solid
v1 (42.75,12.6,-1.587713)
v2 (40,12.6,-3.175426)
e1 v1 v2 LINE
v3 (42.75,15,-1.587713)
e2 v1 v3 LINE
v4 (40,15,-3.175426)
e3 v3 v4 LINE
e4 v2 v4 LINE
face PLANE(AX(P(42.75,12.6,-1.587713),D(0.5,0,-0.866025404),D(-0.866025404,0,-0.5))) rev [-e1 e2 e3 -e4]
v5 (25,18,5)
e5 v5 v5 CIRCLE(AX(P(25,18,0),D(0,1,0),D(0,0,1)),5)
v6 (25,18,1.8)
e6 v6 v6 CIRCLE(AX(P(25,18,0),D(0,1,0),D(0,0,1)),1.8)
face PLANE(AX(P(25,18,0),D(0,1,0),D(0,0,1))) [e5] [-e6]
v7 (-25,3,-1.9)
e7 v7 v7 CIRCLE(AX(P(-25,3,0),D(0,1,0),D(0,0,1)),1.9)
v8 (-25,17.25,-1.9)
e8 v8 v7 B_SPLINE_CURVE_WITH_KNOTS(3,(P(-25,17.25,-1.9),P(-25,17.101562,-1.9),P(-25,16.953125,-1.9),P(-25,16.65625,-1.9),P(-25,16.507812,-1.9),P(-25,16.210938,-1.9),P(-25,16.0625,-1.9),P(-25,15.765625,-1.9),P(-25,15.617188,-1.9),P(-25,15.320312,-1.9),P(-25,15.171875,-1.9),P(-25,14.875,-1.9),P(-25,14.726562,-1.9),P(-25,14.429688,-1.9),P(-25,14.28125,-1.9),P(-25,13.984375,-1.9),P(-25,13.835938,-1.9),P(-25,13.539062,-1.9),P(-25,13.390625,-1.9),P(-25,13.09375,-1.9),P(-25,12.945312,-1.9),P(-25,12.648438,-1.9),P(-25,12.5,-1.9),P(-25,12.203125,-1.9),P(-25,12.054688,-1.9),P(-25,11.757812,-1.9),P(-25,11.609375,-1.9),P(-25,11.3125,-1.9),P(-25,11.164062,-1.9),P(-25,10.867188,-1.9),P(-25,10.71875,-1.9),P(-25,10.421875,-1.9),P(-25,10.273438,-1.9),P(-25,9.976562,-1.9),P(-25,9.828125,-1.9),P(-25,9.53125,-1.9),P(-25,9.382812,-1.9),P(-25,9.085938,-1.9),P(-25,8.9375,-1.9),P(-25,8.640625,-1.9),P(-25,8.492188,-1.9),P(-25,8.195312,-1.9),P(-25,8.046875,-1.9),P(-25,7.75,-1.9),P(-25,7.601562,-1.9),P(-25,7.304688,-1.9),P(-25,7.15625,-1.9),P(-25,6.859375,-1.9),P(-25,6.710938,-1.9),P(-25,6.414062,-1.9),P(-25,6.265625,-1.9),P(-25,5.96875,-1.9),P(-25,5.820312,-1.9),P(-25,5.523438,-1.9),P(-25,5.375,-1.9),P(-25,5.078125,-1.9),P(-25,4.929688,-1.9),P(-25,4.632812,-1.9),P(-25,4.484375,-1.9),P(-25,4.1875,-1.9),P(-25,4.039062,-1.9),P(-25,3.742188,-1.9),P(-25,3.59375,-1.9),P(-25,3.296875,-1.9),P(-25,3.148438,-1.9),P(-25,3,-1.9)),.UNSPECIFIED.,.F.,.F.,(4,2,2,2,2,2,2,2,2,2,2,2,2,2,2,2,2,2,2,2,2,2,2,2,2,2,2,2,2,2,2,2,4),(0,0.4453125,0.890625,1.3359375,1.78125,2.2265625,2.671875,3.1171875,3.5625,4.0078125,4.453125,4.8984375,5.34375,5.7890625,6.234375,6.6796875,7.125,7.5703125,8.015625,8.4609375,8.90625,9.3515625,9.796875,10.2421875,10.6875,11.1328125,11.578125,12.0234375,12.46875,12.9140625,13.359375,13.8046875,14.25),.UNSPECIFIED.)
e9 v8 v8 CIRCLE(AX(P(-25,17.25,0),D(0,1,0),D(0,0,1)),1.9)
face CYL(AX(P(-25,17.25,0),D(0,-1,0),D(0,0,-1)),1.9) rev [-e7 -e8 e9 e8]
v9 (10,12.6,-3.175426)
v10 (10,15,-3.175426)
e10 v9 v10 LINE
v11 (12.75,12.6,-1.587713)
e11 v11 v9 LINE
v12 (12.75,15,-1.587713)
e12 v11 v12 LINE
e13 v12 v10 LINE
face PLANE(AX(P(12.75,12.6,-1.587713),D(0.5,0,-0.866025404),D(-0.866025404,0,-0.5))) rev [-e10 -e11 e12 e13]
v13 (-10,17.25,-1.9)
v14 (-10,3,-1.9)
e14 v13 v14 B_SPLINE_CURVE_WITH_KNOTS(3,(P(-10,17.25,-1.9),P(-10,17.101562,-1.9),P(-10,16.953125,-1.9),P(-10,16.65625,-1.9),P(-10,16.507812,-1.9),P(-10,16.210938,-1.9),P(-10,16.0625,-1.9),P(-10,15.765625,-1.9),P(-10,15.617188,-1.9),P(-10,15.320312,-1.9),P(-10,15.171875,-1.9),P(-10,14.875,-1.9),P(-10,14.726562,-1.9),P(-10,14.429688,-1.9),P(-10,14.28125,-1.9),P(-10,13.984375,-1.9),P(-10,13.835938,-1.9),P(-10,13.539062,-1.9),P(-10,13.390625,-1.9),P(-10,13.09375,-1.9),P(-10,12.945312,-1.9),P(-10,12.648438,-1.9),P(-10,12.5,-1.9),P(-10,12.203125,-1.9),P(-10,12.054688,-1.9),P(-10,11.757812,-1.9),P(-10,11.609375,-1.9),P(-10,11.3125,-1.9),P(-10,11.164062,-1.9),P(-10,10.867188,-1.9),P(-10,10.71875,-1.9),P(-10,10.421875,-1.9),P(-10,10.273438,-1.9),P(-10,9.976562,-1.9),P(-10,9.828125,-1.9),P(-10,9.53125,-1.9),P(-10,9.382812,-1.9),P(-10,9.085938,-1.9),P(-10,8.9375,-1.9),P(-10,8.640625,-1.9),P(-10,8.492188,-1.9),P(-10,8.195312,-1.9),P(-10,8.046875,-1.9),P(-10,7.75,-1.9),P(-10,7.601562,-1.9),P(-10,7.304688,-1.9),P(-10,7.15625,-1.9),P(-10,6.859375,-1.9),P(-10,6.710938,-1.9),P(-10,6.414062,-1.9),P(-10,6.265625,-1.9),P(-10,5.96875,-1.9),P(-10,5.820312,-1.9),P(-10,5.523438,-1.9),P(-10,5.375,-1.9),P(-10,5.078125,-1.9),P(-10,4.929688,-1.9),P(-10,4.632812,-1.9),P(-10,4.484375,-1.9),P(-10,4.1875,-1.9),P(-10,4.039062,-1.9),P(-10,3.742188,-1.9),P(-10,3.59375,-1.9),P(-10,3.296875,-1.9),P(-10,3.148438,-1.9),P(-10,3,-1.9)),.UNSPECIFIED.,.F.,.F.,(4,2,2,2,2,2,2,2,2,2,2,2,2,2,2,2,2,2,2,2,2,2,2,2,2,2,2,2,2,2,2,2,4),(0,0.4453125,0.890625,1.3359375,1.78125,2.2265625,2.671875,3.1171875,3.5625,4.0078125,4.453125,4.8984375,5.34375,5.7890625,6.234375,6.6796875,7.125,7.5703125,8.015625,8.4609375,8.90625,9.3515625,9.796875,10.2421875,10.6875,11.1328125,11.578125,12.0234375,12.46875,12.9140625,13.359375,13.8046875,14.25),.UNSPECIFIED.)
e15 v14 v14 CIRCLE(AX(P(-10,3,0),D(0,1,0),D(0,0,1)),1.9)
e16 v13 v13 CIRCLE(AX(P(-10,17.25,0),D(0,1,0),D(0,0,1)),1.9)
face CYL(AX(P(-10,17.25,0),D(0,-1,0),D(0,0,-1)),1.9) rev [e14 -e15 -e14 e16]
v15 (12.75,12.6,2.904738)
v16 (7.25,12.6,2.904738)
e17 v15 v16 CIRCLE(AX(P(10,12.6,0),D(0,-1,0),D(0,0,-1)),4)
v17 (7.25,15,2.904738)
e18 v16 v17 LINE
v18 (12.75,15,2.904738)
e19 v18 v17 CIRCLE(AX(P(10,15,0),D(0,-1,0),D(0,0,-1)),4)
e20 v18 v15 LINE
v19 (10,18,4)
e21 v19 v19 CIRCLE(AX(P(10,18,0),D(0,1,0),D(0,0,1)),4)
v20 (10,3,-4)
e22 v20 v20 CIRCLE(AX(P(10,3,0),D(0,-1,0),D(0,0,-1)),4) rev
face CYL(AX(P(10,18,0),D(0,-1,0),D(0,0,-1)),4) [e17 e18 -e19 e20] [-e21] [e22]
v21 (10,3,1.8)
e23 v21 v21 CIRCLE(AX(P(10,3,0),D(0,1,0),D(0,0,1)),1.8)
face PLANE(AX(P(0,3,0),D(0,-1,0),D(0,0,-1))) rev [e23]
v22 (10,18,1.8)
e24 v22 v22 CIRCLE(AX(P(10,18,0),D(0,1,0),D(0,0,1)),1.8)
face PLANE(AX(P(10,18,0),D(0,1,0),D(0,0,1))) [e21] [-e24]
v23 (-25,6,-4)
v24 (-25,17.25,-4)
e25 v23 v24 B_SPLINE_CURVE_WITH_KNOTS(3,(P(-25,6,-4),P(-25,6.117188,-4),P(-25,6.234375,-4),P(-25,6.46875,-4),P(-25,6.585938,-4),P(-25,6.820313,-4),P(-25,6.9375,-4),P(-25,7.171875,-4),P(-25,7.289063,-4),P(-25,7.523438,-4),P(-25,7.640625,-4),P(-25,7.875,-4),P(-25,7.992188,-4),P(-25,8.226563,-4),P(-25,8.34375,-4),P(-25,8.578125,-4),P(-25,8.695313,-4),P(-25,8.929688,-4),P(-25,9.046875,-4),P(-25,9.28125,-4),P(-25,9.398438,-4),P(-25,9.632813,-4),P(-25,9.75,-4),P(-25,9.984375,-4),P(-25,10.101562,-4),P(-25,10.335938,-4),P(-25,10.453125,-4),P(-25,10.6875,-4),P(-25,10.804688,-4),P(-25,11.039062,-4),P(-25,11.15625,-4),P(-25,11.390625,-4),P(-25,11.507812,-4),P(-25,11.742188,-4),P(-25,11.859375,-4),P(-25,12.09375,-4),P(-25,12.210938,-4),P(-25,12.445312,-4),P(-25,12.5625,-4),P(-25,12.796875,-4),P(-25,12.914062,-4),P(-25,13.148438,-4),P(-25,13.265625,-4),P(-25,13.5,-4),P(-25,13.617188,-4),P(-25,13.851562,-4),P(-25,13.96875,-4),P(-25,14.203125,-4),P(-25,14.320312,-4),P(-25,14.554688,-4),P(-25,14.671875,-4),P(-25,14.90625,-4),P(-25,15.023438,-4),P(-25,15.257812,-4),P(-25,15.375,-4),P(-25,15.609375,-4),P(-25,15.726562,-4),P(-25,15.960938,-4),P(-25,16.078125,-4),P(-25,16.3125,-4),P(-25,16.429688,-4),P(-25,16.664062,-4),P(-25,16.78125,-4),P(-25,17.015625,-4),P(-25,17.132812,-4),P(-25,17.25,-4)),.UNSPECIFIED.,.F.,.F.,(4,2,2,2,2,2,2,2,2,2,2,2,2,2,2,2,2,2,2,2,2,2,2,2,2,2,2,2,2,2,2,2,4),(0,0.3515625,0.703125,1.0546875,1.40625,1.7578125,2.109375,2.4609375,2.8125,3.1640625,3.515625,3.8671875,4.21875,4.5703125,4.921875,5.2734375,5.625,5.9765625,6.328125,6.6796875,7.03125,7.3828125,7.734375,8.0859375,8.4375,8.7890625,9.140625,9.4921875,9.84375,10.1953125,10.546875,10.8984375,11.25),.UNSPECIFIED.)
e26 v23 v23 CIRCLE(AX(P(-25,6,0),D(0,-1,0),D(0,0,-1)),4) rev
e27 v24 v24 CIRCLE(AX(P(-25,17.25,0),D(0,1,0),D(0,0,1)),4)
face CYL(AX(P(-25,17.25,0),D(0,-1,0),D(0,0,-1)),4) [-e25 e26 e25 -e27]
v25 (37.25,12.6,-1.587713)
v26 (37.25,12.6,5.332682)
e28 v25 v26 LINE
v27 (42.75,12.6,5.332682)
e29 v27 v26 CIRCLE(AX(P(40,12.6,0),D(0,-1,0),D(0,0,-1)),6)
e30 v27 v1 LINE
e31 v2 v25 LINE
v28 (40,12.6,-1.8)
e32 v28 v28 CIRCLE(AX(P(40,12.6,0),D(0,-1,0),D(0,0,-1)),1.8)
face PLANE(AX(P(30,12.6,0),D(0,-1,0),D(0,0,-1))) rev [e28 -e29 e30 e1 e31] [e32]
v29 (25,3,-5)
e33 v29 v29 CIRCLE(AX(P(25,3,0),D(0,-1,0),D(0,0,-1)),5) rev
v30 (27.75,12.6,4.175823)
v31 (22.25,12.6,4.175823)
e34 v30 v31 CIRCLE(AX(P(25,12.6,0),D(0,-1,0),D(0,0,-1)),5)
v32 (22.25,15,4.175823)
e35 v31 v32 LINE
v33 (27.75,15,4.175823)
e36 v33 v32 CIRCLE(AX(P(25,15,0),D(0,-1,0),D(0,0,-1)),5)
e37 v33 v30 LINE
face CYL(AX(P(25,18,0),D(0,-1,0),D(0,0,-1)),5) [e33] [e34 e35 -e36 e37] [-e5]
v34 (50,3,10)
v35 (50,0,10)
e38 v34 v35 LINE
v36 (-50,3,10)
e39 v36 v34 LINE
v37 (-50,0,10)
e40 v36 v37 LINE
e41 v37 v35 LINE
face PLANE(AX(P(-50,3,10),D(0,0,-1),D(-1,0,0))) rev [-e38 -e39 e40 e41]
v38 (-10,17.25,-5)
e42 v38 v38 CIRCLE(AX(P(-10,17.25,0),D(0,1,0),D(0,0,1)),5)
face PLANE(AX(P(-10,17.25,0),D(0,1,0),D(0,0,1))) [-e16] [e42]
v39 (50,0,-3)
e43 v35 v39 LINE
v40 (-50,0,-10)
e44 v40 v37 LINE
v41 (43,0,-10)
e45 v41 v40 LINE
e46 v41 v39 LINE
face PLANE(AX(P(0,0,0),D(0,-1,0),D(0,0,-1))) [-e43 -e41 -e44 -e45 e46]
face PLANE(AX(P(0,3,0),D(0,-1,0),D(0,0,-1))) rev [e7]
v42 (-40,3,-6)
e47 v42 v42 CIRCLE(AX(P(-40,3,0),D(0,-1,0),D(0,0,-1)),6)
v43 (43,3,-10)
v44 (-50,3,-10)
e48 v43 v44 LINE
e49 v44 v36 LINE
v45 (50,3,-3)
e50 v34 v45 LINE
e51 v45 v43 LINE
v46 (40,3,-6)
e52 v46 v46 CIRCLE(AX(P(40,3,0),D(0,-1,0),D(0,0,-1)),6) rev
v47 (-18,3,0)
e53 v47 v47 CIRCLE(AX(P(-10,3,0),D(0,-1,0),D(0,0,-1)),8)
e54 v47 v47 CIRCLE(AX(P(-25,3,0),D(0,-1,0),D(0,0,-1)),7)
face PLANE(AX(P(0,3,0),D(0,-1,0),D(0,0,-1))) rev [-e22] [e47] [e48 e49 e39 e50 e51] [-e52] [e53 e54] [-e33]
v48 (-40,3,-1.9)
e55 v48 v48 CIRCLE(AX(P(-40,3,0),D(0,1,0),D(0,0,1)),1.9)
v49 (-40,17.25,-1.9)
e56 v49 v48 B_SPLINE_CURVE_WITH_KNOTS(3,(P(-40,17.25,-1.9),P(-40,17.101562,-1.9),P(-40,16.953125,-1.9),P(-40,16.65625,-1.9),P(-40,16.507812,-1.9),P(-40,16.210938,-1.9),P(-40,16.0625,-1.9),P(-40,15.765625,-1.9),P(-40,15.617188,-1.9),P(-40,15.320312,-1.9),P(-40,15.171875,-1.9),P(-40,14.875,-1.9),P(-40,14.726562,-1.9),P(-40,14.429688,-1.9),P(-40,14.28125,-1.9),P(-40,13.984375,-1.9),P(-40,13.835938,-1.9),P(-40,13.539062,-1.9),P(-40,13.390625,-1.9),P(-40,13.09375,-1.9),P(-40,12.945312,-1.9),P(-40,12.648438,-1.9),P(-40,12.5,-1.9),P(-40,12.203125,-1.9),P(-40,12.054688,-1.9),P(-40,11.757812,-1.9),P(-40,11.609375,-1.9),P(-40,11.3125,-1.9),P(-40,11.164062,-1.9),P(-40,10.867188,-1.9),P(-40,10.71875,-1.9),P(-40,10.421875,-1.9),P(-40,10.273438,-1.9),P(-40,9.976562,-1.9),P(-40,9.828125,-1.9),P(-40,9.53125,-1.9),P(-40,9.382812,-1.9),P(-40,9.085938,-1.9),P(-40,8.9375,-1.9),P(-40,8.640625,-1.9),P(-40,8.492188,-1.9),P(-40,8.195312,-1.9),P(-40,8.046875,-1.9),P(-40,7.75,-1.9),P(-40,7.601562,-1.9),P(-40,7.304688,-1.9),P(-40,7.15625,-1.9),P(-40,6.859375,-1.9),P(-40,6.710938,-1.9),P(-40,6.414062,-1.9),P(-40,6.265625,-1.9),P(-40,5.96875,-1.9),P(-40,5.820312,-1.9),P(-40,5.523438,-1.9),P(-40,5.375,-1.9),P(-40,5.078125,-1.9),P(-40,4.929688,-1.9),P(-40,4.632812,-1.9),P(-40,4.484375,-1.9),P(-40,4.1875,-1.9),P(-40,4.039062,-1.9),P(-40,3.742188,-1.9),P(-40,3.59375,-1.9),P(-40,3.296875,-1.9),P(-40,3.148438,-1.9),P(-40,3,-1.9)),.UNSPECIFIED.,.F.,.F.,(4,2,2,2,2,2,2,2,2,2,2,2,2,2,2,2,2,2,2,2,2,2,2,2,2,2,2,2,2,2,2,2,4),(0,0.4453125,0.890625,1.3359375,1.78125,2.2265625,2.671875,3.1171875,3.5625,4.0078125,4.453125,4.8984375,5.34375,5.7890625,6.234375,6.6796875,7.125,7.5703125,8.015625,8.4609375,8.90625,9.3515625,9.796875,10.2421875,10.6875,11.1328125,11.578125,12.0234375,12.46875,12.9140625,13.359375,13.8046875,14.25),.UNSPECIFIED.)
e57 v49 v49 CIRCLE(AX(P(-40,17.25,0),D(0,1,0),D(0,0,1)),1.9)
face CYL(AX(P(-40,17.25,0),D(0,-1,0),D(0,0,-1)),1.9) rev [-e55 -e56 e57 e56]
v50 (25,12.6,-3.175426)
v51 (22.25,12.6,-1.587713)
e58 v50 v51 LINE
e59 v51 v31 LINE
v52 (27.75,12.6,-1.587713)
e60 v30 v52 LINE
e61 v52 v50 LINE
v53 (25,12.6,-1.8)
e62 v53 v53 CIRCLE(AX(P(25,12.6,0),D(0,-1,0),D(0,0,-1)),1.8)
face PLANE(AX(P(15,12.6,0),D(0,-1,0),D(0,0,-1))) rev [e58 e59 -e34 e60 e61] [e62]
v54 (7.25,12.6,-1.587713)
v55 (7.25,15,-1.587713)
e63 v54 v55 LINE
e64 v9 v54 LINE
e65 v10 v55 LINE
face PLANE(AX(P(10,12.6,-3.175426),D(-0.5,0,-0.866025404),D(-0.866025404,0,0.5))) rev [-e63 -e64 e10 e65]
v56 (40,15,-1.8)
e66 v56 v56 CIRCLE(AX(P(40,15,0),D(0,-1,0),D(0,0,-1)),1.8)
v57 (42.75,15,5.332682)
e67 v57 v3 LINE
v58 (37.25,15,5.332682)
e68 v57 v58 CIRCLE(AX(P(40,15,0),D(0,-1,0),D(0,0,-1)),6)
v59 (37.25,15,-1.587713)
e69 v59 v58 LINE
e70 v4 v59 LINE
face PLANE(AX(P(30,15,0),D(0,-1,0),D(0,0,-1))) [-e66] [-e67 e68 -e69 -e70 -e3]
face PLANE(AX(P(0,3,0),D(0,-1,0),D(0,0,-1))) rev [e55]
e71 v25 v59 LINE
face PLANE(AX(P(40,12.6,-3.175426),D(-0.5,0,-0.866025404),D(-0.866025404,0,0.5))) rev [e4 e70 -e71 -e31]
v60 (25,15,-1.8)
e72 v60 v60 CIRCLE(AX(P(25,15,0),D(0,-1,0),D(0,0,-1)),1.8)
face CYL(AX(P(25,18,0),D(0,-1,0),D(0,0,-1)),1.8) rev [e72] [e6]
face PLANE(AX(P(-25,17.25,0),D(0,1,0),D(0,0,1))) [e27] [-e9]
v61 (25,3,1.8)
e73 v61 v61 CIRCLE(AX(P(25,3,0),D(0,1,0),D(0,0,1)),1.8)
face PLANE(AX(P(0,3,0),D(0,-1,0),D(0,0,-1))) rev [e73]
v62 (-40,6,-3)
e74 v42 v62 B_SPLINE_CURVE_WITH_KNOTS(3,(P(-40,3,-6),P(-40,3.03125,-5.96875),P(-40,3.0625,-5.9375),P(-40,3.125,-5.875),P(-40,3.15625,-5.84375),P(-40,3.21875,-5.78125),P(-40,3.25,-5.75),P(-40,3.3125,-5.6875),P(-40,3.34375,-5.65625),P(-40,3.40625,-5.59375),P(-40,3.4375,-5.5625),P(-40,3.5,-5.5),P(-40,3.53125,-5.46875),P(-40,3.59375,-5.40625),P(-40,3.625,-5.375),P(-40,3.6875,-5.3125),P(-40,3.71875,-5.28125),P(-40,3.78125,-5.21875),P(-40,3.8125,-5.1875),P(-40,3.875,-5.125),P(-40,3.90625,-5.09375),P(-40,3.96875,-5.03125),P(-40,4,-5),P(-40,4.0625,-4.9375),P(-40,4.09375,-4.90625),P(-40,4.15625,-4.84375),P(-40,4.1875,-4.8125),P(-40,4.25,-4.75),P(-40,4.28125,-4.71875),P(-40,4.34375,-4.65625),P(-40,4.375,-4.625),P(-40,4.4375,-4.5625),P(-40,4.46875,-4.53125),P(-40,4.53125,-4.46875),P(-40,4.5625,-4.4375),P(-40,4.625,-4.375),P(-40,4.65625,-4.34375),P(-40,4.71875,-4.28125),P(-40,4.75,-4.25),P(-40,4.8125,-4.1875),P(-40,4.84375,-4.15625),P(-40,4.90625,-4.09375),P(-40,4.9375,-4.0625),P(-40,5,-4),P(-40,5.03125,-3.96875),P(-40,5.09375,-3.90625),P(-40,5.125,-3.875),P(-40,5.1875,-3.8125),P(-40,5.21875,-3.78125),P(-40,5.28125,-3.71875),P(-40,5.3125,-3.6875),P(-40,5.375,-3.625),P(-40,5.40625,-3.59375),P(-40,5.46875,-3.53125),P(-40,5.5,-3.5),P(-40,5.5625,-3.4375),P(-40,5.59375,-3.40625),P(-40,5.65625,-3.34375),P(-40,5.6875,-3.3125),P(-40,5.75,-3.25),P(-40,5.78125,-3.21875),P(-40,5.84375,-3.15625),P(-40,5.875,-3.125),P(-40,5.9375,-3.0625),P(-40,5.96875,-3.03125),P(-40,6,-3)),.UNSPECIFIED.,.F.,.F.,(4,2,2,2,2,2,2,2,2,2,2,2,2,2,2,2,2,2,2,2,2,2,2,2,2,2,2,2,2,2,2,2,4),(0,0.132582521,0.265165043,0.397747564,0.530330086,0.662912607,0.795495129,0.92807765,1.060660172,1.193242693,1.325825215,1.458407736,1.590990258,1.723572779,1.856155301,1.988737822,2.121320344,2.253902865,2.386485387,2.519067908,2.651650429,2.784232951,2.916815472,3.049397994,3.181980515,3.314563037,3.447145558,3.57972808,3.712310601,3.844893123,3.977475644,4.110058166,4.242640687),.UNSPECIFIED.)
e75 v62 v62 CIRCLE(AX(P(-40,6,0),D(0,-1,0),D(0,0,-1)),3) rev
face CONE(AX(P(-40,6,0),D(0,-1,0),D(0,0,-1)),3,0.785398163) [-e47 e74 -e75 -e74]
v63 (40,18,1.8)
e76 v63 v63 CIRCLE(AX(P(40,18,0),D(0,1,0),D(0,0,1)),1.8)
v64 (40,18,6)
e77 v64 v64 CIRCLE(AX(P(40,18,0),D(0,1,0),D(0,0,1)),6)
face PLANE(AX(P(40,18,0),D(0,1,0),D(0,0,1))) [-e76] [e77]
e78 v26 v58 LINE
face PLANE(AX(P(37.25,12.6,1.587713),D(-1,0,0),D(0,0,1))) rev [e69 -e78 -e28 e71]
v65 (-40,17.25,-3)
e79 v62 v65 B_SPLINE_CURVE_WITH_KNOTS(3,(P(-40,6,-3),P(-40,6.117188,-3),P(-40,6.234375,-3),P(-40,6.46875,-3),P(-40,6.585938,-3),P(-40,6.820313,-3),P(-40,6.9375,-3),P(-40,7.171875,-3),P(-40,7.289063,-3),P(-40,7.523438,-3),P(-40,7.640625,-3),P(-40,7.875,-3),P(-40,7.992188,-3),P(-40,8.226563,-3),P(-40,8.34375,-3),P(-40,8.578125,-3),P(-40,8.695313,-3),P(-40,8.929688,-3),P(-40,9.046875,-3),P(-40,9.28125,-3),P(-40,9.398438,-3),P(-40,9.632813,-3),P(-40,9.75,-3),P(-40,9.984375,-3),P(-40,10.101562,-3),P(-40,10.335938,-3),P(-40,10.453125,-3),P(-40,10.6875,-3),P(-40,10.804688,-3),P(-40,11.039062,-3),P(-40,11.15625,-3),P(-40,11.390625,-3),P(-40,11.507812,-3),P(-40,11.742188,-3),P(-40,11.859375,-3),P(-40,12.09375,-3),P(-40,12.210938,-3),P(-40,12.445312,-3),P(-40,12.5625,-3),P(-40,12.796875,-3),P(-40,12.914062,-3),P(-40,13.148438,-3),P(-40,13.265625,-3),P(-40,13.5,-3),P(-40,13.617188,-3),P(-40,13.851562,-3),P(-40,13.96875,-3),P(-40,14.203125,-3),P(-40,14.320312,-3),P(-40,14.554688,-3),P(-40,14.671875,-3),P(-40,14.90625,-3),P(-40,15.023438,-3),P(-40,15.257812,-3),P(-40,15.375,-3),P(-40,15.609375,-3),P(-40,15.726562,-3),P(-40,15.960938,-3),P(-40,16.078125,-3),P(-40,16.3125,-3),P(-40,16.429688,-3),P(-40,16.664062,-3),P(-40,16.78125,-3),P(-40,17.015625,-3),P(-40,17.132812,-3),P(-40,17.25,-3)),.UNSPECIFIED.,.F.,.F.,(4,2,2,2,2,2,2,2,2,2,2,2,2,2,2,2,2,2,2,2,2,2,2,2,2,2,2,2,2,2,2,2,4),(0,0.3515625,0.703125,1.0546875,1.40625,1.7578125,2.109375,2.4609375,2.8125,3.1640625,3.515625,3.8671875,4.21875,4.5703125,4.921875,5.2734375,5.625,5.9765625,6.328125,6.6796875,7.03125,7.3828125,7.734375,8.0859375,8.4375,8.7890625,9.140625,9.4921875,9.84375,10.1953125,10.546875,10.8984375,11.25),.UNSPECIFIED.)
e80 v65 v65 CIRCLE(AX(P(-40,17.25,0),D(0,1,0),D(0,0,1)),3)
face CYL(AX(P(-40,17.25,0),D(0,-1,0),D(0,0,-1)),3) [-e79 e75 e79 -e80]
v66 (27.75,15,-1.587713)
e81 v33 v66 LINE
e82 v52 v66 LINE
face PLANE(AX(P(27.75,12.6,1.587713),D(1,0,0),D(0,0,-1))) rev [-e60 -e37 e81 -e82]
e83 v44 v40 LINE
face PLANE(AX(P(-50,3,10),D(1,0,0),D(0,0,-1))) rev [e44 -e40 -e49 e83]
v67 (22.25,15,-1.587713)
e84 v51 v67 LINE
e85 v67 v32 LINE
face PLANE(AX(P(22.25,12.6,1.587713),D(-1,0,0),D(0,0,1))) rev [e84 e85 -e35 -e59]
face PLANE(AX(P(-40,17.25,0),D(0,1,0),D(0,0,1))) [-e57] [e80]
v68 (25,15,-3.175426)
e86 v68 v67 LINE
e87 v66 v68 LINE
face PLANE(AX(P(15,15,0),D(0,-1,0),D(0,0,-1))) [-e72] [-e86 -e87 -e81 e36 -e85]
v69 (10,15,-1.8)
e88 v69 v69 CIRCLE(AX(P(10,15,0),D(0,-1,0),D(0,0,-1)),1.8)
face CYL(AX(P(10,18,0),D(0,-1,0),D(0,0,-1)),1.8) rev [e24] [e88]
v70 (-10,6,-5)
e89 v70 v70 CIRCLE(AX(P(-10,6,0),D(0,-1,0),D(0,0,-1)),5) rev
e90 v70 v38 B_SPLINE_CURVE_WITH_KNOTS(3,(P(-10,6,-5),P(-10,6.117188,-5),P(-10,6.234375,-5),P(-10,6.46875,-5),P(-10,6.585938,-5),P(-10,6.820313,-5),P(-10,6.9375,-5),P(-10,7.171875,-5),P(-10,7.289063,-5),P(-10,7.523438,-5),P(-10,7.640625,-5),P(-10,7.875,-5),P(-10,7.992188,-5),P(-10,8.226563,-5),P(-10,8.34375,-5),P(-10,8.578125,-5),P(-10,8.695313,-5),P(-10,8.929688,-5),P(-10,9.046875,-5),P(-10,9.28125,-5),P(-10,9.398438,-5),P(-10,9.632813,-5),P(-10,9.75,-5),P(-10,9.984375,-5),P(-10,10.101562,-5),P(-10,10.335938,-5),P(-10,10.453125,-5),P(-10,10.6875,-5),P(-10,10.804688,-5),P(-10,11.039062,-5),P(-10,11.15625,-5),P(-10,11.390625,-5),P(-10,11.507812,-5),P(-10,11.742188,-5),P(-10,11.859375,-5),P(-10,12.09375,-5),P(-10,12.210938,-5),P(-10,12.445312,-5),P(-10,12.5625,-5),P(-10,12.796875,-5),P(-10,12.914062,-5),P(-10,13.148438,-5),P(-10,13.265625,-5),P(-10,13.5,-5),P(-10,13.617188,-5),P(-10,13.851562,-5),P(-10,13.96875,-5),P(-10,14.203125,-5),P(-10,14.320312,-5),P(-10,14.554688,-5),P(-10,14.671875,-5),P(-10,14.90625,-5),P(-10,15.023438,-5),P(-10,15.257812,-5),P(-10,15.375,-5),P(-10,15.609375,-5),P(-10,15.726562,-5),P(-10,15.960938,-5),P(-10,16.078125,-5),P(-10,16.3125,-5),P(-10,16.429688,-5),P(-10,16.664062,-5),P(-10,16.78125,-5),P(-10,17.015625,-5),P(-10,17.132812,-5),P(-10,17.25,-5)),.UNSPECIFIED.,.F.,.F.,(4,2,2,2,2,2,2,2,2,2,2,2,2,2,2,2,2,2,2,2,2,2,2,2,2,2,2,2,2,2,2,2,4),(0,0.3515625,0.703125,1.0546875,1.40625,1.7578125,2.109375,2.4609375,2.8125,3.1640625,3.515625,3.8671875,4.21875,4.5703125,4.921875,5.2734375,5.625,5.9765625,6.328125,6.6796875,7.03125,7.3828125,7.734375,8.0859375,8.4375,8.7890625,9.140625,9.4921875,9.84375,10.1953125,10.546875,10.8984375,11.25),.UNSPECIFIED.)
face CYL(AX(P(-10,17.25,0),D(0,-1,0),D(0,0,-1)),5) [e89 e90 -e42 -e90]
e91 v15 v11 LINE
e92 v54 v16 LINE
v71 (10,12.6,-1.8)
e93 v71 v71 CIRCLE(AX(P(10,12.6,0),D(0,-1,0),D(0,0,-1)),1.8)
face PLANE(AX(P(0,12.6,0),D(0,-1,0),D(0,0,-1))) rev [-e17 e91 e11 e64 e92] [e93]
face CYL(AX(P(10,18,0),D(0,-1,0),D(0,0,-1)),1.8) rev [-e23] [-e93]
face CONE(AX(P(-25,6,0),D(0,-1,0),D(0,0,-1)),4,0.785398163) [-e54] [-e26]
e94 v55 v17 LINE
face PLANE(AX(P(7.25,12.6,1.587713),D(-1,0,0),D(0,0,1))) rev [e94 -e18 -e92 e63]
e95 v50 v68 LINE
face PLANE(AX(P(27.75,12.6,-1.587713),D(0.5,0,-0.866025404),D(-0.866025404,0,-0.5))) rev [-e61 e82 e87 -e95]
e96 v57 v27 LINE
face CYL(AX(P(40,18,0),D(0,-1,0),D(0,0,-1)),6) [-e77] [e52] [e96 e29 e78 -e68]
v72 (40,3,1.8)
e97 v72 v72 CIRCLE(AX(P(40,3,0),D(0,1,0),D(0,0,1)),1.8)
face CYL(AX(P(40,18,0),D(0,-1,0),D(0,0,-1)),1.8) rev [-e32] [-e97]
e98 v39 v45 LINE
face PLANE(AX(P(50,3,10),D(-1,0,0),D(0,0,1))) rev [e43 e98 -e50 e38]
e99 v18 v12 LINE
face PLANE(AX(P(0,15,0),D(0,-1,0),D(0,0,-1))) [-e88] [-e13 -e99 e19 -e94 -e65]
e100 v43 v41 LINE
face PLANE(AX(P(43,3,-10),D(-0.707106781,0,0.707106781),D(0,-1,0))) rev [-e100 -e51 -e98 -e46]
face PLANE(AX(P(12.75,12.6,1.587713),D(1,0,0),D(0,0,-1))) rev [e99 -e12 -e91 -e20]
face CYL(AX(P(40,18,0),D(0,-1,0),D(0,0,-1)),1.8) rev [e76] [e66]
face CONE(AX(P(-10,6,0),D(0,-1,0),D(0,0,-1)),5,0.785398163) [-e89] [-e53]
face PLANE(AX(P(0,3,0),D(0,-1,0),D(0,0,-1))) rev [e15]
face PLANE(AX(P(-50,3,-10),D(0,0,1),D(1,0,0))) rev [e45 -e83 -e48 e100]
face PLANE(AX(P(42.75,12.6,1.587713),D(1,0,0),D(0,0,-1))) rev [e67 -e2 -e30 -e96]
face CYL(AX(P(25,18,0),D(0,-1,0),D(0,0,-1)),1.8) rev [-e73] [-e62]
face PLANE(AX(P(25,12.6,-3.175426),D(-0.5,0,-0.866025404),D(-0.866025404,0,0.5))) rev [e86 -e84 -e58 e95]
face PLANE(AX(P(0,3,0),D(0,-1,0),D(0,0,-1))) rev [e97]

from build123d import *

# Parameters (mm, degrees)
SKETCH1_W           = 100
SKETCH1_H           = 20
BOSS_EXTRUDE1_DEPTH = 3
SKETCH2_R           = 4
SKETCH2_R_2         = 1.9
SKETCH2_R_3         = 3
SKETCH2_R_4         = 5
BOSS_EXTRUDE2_DEPTH = 14.25
CHAMFER1_SIZE       = 3
CHAMFER2_SIZE       = 3
CHAMFER3_SIZE       = 3
SKETCH14_R          = 4
SKETCH14_R_2        = 1.8
SKETCH14_R_3        = 5
SKETCH14_R_4        = 6
BOSS_EXTRUDE3_DEPTH = 15
CHAMFER4_SIZE       = 7
CUT_EXTRUDE2_START  = 12
CUT_EXTRUDE2_DEPTH  = 2.4
LPATTERN2_COUNT     = 3
LPATTERN2_PITCH     = 15


with BuildPart() as part:
    # Sketch1 → Boss-Extrude1 (new body)
    with BuildSketch(Plane(origin=(0, 0, 0), x_dir=(1, 0, 0), z_dir=(0, 1, 0))):
        Rectangle(SKETCH1_W, SKETCH1_H)
    extrude(amount=BOSS_EXTRUDE1_DEPTH)

    # Sketch2 → Boss-Extrude2 (add)
    # profile 1 of 3: a face of its own
    with BuildSketch(Plane(origin=(0, 3, 0), x_dir=(1, 0, 0), z_dir=(0, 1, 0))):
        with Locations(Location((-25, 0, 0), (0, 0, 90))):
            Circle(SKETCH2_R)
        with Locations(Location((-25, 0, 0), (0, 0, 90))):
            Circle(SKETCH2_R_2, mode=Mode.SUBTRACT)
    # profile 2 of 3: a face of its own
    with BuildSketch(Plane(origin=(0, 3, 0), x_dir=(1, 0, 0), z_dir=(0, 1, 0))):
        with Locations(Location((-40, 0, 0), (0, 0, 90))):
            Circle(SKETCH2_R_3)
        with Locations(Location((-40, 0, 0), (0, 0, 90))):
            Circle(SKETCH2_R_2, mode=Mode.SUBTRACT)
    # profile 3 of 3: a face of its own
    with BuildSketch(Plane(origin=(0, 3, 0), x_dir=(1, 0, 0), z_dir=(0, 1, 0))):
        with Locations(Location((-10, 0, 0), (0, 0, 90))):
            Circle(SKETCH2_R_4)
        with Locations(Location((-10, 0, 0), (0, 0, 90))):
            Circle(SKETCH2_R_2, mode=Mode.SUBTRACT)
    extrude(amount=BOSS_EXTRUDE2_DEPTH)

    # Chamfer1
    chamfer1_edges = [part.edges().sort_by_distance(p)[0] for p in [
        (-40, 3, 3),
    ]]
    chamfer(chamfer1_edges, length=CHAMFER1_SIZE)

    # Chamfer2
    chamfer2_edges = [part.edges().sort_by_distance(p)[0] for p in [
        (-25, 3, 4),
    ]]
    chamfer(chamfer2_edges, length=CHAMFER2_SIZE)

    # Chamfer3
    chamfer3_edges = [part.edges().sort_by_distance(p)[0] for p in [
        (-10, 3, 5),
    ]]
    chamfer(chamfer3_edges, length=CHAMFER3_SIZE - 0.0001)  # a hair under: the kernel refuses the full size

    # Sketch14 → Boss-Extrude3 (add)
    # profile 1 of 3: a face of its own
    with BuildSketch(Plane(origin=(0, 3, 0), x_dir=(1, 0, 0), z_dir=(0, 1, 0))):
        with Locations(Location((10, 0, 0), (0, 0, 90))):
            Circle(SKETCH14_R)
        with Locations(Location((10, 0, 0), (0, 0, 270))):
            Circle(SKETCH14_R_2, mode=Mode.SUBTRACT)
    # profile 2 of 3: a face of its own
    with BuildSketch(Plane(origin=(0, 3, 0), x_dir=(1, 0, 0), z_dir=(0, 1, 0))):
        with Locations(Location((25, 0, 0), (0, 0, 90))):
            Circle(SKETCH14_R_3)
        with Locations(Location((25, 0, 0), (0, 0, 270))):
            Circle(SKETCH14_R_2, mode=Mode.SUBTRACT)
    # profile 3 of 3: a face of its own
    with BuildSketch(Plane(origin=(0, 3, 0), x_dir=(1, 0, 0), z_dir=(0, 1, 0))):
        with Locations(Location((40, 0, 0), (0, 0, 90))):
            Circle(SKETCH14_R_4)
        with Locations(Location((40, 0, 0), (0, 0, 270))):
            Circle(SKETCH14_R_2, mode=Mode.SUBTRACT)
    extrude(amount=BOSS_EXTRUDE3_DEPTH)

    # Chamfer4
    chamfer4_edges = [part.edges().sort_by_distance(p)[0] for p in [
        (50, 1.5, -10),
    ]]
    chamfer(chamfer4_edges, length=CHAMFER4_SIZE)

    # Sketch16 → Cut-Extrude2 (cut)
    with BuildSketch(Plane(origin=(0, 3, 0), x_dir=(1, 0, 0), z_dir=(0, 1, 0)).offset(CUT_EXTRUDE2_START)):
        Polygon((7.25, -1.58771324), (7.25, -10), (12.75, -10), (12.75, -1.58771324), (12.75, 1.58771324), (10, 3.175426481), (7.25, 1.58771324), align=None)
    cut_extrude2 = extrude(amount=-CUT_EXTRUDE2_DEPTH, mode=Mode.SUBTRACT)

    # LPattern2: Cut-Extrude2 ×3
    with Locations(*[(i * LPATTERN2_PITCH, 0, 0) for i in range(1, LPATTERN2_COUNT)]):
        add(cut_extrude2, mode=Mode.SUBTRACT)


solid = part.part
